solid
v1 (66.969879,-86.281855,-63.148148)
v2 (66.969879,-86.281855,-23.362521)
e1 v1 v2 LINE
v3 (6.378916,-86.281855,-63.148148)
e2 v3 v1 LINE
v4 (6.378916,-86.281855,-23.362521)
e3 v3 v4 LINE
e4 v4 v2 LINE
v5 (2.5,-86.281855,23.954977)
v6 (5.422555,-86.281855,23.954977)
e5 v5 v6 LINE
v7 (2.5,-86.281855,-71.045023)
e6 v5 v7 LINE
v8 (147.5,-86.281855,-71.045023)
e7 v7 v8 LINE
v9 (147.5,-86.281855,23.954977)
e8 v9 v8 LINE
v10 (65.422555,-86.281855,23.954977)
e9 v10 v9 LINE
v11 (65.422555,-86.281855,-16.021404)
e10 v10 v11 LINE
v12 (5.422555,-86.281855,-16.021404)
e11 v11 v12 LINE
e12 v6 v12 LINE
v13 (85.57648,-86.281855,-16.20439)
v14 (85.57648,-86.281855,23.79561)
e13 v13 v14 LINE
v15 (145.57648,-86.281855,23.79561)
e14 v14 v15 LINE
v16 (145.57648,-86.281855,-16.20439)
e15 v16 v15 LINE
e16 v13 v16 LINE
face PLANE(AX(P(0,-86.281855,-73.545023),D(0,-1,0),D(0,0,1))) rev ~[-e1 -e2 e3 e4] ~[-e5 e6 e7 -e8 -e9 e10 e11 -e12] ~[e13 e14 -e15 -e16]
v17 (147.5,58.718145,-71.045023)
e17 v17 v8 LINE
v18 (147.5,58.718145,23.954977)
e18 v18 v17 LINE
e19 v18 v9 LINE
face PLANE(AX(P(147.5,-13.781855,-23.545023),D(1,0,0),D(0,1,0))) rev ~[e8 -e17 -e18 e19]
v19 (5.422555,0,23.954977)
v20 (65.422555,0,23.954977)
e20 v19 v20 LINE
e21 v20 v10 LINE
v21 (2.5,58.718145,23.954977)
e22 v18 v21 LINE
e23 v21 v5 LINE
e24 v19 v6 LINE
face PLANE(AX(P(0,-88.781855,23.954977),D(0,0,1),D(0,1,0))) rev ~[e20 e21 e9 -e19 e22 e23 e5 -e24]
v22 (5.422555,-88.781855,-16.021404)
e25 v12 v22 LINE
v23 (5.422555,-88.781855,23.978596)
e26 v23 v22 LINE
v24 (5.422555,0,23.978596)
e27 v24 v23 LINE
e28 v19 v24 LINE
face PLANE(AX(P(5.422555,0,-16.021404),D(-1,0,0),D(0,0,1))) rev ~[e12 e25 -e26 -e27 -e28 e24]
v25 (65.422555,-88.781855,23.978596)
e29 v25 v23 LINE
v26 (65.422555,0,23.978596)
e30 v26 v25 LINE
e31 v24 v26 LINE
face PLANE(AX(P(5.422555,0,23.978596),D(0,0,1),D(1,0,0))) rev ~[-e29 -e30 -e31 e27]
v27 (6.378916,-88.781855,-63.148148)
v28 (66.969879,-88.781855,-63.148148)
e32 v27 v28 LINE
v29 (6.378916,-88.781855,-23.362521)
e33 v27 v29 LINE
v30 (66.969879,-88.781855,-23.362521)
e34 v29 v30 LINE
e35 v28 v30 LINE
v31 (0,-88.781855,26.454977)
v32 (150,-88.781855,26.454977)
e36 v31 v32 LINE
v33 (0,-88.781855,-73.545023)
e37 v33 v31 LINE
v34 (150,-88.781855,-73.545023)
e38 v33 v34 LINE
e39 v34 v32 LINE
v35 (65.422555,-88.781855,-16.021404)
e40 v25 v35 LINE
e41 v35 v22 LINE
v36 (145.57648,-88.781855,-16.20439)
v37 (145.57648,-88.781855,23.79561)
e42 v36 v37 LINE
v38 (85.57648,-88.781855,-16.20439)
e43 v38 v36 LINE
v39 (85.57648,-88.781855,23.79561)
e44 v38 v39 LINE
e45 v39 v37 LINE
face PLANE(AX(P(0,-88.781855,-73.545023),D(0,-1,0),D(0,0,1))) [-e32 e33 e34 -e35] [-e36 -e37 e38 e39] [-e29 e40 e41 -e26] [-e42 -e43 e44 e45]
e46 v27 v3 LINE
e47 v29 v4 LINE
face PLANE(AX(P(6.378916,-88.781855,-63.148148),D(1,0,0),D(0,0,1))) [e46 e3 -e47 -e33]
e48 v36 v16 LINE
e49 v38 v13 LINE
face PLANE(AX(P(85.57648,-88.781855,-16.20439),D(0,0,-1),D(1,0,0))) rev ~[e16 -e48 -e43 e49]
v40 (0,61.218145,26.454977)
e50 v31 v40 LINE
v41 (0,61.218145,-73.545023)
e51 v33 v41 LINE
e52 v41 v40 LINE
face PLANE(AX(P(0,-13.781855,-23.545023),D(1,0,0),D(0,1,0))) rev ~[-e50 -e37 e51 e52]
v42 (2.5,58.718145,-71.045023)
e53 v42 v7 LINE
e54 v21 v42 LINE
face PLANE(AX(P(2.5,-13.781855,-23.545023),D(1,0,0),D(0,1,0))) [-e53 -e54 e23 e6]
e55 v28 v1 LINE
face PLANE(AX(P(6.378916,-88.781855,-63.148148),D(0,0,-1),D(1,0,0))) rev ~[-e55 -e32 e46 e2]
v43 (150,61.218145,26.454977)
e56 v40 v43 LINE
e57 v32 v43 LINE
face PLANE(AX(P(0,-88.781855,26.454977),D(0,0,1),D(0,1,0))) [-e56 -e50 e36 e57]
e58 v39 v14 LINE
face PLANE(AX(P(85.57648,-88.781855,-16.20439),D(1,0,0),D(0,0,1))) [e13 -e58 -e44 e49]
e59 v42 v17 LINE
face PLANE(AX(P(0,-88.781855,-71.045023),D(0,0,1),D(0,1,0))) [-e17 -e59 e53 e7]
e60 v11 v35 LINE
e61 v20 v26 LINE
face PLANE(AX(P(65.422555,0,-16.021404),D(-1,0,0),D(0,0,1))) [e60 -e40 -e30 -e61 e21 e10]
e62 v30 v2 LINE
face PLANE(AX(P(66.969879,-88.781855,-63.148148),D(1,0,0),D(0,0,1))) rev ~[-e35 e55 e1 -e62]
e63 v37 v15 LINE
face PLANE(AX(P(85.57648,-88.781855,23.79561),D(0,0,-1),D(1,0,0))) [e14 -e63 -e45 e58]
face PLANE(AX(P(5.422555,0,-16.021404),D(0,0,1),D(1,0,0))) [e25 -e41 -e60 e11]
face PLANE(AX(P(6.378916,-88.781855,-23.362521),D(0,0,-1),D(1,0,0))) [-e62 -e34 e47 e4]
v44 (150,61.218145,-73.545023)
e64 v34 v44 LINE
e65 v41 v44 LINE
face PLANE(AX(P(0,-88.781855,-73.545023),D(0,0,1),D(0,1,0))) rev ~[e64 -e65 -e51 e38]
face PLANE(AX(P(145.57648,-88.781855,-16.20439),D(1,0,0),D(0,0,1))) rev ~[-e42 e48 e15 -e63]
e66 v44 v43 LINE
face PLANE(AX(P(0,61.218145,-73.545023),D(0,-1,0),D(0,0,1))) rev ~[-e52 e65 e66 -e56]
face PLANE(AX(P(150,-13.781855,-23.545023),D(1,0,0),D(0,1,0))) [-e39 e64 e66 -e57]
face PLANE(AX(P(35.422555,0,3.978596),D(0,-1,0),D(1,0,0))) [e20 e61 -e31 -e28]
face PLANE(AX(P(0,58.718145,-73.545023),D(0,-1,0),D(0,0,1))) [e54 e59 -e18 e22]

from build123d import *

# Parameters (mm, degrees)
F0_W     = 150
F0_H     = 100
F1_DEPTH = 150
F2_T     = -2.5
F3_W     = 60
F3_H     = 40
F4_DEPTH = 468.9
F5_W     = 60
F5_H     = 40
F6_DEPTH = 145
F7_W     = 60.590963345
F7_H     = 39.7856272757
F8_DEPTH = 146.1


# Not quite as in the source:
# - a feature names something its author has since deleted; it is built from what else it names


with BuildPart() as f1:
    # F0 (on Right) → F1 (new body)
    with BuildSketch(Plane.YZ):
        with Locations((-13.7818545103, -23.5450232641)):
            Rectangle(F0_W, F0_H)
    extrude(amount=F1_DEPTH)

    # F2 (hollow: no face is removed)
    offset(amount=F2_T, mode=Mode.SUBTRACT)

    # F3 (on Front) → F4 (cut)
    with BuildSketch(Plane.XZ):
        with Locations((35.4225549102, 3.9785955846)):
            Rectangle(F3_W, F3_H)
    extrude(amount=F4_DEPTH, mode=Mode.SUBTRACT)

    # F5 (on face) → F6 (cut)
    with BuildSketch(Plane.XZ.offset(88.7818545103)):
        with Locations((115.576479584, 3.7956100403)):
            Rectangle(F5_W, F5_H)
    extrude(amount=-F6_DEPTH, mode=Mode.SUBTRACT)

    # F7 (on face) → F8 (cut)
    with BuildSketch(Plane.XZ.offset(88.7818545103)):
        with Locations((36.6743972991, -43.25533472)):
            Rectangle(F7_W, F7_H)
    extrude(amount=-F8_DEPTH, mode=Mode.SUBTRACT)


solid = f1.part
